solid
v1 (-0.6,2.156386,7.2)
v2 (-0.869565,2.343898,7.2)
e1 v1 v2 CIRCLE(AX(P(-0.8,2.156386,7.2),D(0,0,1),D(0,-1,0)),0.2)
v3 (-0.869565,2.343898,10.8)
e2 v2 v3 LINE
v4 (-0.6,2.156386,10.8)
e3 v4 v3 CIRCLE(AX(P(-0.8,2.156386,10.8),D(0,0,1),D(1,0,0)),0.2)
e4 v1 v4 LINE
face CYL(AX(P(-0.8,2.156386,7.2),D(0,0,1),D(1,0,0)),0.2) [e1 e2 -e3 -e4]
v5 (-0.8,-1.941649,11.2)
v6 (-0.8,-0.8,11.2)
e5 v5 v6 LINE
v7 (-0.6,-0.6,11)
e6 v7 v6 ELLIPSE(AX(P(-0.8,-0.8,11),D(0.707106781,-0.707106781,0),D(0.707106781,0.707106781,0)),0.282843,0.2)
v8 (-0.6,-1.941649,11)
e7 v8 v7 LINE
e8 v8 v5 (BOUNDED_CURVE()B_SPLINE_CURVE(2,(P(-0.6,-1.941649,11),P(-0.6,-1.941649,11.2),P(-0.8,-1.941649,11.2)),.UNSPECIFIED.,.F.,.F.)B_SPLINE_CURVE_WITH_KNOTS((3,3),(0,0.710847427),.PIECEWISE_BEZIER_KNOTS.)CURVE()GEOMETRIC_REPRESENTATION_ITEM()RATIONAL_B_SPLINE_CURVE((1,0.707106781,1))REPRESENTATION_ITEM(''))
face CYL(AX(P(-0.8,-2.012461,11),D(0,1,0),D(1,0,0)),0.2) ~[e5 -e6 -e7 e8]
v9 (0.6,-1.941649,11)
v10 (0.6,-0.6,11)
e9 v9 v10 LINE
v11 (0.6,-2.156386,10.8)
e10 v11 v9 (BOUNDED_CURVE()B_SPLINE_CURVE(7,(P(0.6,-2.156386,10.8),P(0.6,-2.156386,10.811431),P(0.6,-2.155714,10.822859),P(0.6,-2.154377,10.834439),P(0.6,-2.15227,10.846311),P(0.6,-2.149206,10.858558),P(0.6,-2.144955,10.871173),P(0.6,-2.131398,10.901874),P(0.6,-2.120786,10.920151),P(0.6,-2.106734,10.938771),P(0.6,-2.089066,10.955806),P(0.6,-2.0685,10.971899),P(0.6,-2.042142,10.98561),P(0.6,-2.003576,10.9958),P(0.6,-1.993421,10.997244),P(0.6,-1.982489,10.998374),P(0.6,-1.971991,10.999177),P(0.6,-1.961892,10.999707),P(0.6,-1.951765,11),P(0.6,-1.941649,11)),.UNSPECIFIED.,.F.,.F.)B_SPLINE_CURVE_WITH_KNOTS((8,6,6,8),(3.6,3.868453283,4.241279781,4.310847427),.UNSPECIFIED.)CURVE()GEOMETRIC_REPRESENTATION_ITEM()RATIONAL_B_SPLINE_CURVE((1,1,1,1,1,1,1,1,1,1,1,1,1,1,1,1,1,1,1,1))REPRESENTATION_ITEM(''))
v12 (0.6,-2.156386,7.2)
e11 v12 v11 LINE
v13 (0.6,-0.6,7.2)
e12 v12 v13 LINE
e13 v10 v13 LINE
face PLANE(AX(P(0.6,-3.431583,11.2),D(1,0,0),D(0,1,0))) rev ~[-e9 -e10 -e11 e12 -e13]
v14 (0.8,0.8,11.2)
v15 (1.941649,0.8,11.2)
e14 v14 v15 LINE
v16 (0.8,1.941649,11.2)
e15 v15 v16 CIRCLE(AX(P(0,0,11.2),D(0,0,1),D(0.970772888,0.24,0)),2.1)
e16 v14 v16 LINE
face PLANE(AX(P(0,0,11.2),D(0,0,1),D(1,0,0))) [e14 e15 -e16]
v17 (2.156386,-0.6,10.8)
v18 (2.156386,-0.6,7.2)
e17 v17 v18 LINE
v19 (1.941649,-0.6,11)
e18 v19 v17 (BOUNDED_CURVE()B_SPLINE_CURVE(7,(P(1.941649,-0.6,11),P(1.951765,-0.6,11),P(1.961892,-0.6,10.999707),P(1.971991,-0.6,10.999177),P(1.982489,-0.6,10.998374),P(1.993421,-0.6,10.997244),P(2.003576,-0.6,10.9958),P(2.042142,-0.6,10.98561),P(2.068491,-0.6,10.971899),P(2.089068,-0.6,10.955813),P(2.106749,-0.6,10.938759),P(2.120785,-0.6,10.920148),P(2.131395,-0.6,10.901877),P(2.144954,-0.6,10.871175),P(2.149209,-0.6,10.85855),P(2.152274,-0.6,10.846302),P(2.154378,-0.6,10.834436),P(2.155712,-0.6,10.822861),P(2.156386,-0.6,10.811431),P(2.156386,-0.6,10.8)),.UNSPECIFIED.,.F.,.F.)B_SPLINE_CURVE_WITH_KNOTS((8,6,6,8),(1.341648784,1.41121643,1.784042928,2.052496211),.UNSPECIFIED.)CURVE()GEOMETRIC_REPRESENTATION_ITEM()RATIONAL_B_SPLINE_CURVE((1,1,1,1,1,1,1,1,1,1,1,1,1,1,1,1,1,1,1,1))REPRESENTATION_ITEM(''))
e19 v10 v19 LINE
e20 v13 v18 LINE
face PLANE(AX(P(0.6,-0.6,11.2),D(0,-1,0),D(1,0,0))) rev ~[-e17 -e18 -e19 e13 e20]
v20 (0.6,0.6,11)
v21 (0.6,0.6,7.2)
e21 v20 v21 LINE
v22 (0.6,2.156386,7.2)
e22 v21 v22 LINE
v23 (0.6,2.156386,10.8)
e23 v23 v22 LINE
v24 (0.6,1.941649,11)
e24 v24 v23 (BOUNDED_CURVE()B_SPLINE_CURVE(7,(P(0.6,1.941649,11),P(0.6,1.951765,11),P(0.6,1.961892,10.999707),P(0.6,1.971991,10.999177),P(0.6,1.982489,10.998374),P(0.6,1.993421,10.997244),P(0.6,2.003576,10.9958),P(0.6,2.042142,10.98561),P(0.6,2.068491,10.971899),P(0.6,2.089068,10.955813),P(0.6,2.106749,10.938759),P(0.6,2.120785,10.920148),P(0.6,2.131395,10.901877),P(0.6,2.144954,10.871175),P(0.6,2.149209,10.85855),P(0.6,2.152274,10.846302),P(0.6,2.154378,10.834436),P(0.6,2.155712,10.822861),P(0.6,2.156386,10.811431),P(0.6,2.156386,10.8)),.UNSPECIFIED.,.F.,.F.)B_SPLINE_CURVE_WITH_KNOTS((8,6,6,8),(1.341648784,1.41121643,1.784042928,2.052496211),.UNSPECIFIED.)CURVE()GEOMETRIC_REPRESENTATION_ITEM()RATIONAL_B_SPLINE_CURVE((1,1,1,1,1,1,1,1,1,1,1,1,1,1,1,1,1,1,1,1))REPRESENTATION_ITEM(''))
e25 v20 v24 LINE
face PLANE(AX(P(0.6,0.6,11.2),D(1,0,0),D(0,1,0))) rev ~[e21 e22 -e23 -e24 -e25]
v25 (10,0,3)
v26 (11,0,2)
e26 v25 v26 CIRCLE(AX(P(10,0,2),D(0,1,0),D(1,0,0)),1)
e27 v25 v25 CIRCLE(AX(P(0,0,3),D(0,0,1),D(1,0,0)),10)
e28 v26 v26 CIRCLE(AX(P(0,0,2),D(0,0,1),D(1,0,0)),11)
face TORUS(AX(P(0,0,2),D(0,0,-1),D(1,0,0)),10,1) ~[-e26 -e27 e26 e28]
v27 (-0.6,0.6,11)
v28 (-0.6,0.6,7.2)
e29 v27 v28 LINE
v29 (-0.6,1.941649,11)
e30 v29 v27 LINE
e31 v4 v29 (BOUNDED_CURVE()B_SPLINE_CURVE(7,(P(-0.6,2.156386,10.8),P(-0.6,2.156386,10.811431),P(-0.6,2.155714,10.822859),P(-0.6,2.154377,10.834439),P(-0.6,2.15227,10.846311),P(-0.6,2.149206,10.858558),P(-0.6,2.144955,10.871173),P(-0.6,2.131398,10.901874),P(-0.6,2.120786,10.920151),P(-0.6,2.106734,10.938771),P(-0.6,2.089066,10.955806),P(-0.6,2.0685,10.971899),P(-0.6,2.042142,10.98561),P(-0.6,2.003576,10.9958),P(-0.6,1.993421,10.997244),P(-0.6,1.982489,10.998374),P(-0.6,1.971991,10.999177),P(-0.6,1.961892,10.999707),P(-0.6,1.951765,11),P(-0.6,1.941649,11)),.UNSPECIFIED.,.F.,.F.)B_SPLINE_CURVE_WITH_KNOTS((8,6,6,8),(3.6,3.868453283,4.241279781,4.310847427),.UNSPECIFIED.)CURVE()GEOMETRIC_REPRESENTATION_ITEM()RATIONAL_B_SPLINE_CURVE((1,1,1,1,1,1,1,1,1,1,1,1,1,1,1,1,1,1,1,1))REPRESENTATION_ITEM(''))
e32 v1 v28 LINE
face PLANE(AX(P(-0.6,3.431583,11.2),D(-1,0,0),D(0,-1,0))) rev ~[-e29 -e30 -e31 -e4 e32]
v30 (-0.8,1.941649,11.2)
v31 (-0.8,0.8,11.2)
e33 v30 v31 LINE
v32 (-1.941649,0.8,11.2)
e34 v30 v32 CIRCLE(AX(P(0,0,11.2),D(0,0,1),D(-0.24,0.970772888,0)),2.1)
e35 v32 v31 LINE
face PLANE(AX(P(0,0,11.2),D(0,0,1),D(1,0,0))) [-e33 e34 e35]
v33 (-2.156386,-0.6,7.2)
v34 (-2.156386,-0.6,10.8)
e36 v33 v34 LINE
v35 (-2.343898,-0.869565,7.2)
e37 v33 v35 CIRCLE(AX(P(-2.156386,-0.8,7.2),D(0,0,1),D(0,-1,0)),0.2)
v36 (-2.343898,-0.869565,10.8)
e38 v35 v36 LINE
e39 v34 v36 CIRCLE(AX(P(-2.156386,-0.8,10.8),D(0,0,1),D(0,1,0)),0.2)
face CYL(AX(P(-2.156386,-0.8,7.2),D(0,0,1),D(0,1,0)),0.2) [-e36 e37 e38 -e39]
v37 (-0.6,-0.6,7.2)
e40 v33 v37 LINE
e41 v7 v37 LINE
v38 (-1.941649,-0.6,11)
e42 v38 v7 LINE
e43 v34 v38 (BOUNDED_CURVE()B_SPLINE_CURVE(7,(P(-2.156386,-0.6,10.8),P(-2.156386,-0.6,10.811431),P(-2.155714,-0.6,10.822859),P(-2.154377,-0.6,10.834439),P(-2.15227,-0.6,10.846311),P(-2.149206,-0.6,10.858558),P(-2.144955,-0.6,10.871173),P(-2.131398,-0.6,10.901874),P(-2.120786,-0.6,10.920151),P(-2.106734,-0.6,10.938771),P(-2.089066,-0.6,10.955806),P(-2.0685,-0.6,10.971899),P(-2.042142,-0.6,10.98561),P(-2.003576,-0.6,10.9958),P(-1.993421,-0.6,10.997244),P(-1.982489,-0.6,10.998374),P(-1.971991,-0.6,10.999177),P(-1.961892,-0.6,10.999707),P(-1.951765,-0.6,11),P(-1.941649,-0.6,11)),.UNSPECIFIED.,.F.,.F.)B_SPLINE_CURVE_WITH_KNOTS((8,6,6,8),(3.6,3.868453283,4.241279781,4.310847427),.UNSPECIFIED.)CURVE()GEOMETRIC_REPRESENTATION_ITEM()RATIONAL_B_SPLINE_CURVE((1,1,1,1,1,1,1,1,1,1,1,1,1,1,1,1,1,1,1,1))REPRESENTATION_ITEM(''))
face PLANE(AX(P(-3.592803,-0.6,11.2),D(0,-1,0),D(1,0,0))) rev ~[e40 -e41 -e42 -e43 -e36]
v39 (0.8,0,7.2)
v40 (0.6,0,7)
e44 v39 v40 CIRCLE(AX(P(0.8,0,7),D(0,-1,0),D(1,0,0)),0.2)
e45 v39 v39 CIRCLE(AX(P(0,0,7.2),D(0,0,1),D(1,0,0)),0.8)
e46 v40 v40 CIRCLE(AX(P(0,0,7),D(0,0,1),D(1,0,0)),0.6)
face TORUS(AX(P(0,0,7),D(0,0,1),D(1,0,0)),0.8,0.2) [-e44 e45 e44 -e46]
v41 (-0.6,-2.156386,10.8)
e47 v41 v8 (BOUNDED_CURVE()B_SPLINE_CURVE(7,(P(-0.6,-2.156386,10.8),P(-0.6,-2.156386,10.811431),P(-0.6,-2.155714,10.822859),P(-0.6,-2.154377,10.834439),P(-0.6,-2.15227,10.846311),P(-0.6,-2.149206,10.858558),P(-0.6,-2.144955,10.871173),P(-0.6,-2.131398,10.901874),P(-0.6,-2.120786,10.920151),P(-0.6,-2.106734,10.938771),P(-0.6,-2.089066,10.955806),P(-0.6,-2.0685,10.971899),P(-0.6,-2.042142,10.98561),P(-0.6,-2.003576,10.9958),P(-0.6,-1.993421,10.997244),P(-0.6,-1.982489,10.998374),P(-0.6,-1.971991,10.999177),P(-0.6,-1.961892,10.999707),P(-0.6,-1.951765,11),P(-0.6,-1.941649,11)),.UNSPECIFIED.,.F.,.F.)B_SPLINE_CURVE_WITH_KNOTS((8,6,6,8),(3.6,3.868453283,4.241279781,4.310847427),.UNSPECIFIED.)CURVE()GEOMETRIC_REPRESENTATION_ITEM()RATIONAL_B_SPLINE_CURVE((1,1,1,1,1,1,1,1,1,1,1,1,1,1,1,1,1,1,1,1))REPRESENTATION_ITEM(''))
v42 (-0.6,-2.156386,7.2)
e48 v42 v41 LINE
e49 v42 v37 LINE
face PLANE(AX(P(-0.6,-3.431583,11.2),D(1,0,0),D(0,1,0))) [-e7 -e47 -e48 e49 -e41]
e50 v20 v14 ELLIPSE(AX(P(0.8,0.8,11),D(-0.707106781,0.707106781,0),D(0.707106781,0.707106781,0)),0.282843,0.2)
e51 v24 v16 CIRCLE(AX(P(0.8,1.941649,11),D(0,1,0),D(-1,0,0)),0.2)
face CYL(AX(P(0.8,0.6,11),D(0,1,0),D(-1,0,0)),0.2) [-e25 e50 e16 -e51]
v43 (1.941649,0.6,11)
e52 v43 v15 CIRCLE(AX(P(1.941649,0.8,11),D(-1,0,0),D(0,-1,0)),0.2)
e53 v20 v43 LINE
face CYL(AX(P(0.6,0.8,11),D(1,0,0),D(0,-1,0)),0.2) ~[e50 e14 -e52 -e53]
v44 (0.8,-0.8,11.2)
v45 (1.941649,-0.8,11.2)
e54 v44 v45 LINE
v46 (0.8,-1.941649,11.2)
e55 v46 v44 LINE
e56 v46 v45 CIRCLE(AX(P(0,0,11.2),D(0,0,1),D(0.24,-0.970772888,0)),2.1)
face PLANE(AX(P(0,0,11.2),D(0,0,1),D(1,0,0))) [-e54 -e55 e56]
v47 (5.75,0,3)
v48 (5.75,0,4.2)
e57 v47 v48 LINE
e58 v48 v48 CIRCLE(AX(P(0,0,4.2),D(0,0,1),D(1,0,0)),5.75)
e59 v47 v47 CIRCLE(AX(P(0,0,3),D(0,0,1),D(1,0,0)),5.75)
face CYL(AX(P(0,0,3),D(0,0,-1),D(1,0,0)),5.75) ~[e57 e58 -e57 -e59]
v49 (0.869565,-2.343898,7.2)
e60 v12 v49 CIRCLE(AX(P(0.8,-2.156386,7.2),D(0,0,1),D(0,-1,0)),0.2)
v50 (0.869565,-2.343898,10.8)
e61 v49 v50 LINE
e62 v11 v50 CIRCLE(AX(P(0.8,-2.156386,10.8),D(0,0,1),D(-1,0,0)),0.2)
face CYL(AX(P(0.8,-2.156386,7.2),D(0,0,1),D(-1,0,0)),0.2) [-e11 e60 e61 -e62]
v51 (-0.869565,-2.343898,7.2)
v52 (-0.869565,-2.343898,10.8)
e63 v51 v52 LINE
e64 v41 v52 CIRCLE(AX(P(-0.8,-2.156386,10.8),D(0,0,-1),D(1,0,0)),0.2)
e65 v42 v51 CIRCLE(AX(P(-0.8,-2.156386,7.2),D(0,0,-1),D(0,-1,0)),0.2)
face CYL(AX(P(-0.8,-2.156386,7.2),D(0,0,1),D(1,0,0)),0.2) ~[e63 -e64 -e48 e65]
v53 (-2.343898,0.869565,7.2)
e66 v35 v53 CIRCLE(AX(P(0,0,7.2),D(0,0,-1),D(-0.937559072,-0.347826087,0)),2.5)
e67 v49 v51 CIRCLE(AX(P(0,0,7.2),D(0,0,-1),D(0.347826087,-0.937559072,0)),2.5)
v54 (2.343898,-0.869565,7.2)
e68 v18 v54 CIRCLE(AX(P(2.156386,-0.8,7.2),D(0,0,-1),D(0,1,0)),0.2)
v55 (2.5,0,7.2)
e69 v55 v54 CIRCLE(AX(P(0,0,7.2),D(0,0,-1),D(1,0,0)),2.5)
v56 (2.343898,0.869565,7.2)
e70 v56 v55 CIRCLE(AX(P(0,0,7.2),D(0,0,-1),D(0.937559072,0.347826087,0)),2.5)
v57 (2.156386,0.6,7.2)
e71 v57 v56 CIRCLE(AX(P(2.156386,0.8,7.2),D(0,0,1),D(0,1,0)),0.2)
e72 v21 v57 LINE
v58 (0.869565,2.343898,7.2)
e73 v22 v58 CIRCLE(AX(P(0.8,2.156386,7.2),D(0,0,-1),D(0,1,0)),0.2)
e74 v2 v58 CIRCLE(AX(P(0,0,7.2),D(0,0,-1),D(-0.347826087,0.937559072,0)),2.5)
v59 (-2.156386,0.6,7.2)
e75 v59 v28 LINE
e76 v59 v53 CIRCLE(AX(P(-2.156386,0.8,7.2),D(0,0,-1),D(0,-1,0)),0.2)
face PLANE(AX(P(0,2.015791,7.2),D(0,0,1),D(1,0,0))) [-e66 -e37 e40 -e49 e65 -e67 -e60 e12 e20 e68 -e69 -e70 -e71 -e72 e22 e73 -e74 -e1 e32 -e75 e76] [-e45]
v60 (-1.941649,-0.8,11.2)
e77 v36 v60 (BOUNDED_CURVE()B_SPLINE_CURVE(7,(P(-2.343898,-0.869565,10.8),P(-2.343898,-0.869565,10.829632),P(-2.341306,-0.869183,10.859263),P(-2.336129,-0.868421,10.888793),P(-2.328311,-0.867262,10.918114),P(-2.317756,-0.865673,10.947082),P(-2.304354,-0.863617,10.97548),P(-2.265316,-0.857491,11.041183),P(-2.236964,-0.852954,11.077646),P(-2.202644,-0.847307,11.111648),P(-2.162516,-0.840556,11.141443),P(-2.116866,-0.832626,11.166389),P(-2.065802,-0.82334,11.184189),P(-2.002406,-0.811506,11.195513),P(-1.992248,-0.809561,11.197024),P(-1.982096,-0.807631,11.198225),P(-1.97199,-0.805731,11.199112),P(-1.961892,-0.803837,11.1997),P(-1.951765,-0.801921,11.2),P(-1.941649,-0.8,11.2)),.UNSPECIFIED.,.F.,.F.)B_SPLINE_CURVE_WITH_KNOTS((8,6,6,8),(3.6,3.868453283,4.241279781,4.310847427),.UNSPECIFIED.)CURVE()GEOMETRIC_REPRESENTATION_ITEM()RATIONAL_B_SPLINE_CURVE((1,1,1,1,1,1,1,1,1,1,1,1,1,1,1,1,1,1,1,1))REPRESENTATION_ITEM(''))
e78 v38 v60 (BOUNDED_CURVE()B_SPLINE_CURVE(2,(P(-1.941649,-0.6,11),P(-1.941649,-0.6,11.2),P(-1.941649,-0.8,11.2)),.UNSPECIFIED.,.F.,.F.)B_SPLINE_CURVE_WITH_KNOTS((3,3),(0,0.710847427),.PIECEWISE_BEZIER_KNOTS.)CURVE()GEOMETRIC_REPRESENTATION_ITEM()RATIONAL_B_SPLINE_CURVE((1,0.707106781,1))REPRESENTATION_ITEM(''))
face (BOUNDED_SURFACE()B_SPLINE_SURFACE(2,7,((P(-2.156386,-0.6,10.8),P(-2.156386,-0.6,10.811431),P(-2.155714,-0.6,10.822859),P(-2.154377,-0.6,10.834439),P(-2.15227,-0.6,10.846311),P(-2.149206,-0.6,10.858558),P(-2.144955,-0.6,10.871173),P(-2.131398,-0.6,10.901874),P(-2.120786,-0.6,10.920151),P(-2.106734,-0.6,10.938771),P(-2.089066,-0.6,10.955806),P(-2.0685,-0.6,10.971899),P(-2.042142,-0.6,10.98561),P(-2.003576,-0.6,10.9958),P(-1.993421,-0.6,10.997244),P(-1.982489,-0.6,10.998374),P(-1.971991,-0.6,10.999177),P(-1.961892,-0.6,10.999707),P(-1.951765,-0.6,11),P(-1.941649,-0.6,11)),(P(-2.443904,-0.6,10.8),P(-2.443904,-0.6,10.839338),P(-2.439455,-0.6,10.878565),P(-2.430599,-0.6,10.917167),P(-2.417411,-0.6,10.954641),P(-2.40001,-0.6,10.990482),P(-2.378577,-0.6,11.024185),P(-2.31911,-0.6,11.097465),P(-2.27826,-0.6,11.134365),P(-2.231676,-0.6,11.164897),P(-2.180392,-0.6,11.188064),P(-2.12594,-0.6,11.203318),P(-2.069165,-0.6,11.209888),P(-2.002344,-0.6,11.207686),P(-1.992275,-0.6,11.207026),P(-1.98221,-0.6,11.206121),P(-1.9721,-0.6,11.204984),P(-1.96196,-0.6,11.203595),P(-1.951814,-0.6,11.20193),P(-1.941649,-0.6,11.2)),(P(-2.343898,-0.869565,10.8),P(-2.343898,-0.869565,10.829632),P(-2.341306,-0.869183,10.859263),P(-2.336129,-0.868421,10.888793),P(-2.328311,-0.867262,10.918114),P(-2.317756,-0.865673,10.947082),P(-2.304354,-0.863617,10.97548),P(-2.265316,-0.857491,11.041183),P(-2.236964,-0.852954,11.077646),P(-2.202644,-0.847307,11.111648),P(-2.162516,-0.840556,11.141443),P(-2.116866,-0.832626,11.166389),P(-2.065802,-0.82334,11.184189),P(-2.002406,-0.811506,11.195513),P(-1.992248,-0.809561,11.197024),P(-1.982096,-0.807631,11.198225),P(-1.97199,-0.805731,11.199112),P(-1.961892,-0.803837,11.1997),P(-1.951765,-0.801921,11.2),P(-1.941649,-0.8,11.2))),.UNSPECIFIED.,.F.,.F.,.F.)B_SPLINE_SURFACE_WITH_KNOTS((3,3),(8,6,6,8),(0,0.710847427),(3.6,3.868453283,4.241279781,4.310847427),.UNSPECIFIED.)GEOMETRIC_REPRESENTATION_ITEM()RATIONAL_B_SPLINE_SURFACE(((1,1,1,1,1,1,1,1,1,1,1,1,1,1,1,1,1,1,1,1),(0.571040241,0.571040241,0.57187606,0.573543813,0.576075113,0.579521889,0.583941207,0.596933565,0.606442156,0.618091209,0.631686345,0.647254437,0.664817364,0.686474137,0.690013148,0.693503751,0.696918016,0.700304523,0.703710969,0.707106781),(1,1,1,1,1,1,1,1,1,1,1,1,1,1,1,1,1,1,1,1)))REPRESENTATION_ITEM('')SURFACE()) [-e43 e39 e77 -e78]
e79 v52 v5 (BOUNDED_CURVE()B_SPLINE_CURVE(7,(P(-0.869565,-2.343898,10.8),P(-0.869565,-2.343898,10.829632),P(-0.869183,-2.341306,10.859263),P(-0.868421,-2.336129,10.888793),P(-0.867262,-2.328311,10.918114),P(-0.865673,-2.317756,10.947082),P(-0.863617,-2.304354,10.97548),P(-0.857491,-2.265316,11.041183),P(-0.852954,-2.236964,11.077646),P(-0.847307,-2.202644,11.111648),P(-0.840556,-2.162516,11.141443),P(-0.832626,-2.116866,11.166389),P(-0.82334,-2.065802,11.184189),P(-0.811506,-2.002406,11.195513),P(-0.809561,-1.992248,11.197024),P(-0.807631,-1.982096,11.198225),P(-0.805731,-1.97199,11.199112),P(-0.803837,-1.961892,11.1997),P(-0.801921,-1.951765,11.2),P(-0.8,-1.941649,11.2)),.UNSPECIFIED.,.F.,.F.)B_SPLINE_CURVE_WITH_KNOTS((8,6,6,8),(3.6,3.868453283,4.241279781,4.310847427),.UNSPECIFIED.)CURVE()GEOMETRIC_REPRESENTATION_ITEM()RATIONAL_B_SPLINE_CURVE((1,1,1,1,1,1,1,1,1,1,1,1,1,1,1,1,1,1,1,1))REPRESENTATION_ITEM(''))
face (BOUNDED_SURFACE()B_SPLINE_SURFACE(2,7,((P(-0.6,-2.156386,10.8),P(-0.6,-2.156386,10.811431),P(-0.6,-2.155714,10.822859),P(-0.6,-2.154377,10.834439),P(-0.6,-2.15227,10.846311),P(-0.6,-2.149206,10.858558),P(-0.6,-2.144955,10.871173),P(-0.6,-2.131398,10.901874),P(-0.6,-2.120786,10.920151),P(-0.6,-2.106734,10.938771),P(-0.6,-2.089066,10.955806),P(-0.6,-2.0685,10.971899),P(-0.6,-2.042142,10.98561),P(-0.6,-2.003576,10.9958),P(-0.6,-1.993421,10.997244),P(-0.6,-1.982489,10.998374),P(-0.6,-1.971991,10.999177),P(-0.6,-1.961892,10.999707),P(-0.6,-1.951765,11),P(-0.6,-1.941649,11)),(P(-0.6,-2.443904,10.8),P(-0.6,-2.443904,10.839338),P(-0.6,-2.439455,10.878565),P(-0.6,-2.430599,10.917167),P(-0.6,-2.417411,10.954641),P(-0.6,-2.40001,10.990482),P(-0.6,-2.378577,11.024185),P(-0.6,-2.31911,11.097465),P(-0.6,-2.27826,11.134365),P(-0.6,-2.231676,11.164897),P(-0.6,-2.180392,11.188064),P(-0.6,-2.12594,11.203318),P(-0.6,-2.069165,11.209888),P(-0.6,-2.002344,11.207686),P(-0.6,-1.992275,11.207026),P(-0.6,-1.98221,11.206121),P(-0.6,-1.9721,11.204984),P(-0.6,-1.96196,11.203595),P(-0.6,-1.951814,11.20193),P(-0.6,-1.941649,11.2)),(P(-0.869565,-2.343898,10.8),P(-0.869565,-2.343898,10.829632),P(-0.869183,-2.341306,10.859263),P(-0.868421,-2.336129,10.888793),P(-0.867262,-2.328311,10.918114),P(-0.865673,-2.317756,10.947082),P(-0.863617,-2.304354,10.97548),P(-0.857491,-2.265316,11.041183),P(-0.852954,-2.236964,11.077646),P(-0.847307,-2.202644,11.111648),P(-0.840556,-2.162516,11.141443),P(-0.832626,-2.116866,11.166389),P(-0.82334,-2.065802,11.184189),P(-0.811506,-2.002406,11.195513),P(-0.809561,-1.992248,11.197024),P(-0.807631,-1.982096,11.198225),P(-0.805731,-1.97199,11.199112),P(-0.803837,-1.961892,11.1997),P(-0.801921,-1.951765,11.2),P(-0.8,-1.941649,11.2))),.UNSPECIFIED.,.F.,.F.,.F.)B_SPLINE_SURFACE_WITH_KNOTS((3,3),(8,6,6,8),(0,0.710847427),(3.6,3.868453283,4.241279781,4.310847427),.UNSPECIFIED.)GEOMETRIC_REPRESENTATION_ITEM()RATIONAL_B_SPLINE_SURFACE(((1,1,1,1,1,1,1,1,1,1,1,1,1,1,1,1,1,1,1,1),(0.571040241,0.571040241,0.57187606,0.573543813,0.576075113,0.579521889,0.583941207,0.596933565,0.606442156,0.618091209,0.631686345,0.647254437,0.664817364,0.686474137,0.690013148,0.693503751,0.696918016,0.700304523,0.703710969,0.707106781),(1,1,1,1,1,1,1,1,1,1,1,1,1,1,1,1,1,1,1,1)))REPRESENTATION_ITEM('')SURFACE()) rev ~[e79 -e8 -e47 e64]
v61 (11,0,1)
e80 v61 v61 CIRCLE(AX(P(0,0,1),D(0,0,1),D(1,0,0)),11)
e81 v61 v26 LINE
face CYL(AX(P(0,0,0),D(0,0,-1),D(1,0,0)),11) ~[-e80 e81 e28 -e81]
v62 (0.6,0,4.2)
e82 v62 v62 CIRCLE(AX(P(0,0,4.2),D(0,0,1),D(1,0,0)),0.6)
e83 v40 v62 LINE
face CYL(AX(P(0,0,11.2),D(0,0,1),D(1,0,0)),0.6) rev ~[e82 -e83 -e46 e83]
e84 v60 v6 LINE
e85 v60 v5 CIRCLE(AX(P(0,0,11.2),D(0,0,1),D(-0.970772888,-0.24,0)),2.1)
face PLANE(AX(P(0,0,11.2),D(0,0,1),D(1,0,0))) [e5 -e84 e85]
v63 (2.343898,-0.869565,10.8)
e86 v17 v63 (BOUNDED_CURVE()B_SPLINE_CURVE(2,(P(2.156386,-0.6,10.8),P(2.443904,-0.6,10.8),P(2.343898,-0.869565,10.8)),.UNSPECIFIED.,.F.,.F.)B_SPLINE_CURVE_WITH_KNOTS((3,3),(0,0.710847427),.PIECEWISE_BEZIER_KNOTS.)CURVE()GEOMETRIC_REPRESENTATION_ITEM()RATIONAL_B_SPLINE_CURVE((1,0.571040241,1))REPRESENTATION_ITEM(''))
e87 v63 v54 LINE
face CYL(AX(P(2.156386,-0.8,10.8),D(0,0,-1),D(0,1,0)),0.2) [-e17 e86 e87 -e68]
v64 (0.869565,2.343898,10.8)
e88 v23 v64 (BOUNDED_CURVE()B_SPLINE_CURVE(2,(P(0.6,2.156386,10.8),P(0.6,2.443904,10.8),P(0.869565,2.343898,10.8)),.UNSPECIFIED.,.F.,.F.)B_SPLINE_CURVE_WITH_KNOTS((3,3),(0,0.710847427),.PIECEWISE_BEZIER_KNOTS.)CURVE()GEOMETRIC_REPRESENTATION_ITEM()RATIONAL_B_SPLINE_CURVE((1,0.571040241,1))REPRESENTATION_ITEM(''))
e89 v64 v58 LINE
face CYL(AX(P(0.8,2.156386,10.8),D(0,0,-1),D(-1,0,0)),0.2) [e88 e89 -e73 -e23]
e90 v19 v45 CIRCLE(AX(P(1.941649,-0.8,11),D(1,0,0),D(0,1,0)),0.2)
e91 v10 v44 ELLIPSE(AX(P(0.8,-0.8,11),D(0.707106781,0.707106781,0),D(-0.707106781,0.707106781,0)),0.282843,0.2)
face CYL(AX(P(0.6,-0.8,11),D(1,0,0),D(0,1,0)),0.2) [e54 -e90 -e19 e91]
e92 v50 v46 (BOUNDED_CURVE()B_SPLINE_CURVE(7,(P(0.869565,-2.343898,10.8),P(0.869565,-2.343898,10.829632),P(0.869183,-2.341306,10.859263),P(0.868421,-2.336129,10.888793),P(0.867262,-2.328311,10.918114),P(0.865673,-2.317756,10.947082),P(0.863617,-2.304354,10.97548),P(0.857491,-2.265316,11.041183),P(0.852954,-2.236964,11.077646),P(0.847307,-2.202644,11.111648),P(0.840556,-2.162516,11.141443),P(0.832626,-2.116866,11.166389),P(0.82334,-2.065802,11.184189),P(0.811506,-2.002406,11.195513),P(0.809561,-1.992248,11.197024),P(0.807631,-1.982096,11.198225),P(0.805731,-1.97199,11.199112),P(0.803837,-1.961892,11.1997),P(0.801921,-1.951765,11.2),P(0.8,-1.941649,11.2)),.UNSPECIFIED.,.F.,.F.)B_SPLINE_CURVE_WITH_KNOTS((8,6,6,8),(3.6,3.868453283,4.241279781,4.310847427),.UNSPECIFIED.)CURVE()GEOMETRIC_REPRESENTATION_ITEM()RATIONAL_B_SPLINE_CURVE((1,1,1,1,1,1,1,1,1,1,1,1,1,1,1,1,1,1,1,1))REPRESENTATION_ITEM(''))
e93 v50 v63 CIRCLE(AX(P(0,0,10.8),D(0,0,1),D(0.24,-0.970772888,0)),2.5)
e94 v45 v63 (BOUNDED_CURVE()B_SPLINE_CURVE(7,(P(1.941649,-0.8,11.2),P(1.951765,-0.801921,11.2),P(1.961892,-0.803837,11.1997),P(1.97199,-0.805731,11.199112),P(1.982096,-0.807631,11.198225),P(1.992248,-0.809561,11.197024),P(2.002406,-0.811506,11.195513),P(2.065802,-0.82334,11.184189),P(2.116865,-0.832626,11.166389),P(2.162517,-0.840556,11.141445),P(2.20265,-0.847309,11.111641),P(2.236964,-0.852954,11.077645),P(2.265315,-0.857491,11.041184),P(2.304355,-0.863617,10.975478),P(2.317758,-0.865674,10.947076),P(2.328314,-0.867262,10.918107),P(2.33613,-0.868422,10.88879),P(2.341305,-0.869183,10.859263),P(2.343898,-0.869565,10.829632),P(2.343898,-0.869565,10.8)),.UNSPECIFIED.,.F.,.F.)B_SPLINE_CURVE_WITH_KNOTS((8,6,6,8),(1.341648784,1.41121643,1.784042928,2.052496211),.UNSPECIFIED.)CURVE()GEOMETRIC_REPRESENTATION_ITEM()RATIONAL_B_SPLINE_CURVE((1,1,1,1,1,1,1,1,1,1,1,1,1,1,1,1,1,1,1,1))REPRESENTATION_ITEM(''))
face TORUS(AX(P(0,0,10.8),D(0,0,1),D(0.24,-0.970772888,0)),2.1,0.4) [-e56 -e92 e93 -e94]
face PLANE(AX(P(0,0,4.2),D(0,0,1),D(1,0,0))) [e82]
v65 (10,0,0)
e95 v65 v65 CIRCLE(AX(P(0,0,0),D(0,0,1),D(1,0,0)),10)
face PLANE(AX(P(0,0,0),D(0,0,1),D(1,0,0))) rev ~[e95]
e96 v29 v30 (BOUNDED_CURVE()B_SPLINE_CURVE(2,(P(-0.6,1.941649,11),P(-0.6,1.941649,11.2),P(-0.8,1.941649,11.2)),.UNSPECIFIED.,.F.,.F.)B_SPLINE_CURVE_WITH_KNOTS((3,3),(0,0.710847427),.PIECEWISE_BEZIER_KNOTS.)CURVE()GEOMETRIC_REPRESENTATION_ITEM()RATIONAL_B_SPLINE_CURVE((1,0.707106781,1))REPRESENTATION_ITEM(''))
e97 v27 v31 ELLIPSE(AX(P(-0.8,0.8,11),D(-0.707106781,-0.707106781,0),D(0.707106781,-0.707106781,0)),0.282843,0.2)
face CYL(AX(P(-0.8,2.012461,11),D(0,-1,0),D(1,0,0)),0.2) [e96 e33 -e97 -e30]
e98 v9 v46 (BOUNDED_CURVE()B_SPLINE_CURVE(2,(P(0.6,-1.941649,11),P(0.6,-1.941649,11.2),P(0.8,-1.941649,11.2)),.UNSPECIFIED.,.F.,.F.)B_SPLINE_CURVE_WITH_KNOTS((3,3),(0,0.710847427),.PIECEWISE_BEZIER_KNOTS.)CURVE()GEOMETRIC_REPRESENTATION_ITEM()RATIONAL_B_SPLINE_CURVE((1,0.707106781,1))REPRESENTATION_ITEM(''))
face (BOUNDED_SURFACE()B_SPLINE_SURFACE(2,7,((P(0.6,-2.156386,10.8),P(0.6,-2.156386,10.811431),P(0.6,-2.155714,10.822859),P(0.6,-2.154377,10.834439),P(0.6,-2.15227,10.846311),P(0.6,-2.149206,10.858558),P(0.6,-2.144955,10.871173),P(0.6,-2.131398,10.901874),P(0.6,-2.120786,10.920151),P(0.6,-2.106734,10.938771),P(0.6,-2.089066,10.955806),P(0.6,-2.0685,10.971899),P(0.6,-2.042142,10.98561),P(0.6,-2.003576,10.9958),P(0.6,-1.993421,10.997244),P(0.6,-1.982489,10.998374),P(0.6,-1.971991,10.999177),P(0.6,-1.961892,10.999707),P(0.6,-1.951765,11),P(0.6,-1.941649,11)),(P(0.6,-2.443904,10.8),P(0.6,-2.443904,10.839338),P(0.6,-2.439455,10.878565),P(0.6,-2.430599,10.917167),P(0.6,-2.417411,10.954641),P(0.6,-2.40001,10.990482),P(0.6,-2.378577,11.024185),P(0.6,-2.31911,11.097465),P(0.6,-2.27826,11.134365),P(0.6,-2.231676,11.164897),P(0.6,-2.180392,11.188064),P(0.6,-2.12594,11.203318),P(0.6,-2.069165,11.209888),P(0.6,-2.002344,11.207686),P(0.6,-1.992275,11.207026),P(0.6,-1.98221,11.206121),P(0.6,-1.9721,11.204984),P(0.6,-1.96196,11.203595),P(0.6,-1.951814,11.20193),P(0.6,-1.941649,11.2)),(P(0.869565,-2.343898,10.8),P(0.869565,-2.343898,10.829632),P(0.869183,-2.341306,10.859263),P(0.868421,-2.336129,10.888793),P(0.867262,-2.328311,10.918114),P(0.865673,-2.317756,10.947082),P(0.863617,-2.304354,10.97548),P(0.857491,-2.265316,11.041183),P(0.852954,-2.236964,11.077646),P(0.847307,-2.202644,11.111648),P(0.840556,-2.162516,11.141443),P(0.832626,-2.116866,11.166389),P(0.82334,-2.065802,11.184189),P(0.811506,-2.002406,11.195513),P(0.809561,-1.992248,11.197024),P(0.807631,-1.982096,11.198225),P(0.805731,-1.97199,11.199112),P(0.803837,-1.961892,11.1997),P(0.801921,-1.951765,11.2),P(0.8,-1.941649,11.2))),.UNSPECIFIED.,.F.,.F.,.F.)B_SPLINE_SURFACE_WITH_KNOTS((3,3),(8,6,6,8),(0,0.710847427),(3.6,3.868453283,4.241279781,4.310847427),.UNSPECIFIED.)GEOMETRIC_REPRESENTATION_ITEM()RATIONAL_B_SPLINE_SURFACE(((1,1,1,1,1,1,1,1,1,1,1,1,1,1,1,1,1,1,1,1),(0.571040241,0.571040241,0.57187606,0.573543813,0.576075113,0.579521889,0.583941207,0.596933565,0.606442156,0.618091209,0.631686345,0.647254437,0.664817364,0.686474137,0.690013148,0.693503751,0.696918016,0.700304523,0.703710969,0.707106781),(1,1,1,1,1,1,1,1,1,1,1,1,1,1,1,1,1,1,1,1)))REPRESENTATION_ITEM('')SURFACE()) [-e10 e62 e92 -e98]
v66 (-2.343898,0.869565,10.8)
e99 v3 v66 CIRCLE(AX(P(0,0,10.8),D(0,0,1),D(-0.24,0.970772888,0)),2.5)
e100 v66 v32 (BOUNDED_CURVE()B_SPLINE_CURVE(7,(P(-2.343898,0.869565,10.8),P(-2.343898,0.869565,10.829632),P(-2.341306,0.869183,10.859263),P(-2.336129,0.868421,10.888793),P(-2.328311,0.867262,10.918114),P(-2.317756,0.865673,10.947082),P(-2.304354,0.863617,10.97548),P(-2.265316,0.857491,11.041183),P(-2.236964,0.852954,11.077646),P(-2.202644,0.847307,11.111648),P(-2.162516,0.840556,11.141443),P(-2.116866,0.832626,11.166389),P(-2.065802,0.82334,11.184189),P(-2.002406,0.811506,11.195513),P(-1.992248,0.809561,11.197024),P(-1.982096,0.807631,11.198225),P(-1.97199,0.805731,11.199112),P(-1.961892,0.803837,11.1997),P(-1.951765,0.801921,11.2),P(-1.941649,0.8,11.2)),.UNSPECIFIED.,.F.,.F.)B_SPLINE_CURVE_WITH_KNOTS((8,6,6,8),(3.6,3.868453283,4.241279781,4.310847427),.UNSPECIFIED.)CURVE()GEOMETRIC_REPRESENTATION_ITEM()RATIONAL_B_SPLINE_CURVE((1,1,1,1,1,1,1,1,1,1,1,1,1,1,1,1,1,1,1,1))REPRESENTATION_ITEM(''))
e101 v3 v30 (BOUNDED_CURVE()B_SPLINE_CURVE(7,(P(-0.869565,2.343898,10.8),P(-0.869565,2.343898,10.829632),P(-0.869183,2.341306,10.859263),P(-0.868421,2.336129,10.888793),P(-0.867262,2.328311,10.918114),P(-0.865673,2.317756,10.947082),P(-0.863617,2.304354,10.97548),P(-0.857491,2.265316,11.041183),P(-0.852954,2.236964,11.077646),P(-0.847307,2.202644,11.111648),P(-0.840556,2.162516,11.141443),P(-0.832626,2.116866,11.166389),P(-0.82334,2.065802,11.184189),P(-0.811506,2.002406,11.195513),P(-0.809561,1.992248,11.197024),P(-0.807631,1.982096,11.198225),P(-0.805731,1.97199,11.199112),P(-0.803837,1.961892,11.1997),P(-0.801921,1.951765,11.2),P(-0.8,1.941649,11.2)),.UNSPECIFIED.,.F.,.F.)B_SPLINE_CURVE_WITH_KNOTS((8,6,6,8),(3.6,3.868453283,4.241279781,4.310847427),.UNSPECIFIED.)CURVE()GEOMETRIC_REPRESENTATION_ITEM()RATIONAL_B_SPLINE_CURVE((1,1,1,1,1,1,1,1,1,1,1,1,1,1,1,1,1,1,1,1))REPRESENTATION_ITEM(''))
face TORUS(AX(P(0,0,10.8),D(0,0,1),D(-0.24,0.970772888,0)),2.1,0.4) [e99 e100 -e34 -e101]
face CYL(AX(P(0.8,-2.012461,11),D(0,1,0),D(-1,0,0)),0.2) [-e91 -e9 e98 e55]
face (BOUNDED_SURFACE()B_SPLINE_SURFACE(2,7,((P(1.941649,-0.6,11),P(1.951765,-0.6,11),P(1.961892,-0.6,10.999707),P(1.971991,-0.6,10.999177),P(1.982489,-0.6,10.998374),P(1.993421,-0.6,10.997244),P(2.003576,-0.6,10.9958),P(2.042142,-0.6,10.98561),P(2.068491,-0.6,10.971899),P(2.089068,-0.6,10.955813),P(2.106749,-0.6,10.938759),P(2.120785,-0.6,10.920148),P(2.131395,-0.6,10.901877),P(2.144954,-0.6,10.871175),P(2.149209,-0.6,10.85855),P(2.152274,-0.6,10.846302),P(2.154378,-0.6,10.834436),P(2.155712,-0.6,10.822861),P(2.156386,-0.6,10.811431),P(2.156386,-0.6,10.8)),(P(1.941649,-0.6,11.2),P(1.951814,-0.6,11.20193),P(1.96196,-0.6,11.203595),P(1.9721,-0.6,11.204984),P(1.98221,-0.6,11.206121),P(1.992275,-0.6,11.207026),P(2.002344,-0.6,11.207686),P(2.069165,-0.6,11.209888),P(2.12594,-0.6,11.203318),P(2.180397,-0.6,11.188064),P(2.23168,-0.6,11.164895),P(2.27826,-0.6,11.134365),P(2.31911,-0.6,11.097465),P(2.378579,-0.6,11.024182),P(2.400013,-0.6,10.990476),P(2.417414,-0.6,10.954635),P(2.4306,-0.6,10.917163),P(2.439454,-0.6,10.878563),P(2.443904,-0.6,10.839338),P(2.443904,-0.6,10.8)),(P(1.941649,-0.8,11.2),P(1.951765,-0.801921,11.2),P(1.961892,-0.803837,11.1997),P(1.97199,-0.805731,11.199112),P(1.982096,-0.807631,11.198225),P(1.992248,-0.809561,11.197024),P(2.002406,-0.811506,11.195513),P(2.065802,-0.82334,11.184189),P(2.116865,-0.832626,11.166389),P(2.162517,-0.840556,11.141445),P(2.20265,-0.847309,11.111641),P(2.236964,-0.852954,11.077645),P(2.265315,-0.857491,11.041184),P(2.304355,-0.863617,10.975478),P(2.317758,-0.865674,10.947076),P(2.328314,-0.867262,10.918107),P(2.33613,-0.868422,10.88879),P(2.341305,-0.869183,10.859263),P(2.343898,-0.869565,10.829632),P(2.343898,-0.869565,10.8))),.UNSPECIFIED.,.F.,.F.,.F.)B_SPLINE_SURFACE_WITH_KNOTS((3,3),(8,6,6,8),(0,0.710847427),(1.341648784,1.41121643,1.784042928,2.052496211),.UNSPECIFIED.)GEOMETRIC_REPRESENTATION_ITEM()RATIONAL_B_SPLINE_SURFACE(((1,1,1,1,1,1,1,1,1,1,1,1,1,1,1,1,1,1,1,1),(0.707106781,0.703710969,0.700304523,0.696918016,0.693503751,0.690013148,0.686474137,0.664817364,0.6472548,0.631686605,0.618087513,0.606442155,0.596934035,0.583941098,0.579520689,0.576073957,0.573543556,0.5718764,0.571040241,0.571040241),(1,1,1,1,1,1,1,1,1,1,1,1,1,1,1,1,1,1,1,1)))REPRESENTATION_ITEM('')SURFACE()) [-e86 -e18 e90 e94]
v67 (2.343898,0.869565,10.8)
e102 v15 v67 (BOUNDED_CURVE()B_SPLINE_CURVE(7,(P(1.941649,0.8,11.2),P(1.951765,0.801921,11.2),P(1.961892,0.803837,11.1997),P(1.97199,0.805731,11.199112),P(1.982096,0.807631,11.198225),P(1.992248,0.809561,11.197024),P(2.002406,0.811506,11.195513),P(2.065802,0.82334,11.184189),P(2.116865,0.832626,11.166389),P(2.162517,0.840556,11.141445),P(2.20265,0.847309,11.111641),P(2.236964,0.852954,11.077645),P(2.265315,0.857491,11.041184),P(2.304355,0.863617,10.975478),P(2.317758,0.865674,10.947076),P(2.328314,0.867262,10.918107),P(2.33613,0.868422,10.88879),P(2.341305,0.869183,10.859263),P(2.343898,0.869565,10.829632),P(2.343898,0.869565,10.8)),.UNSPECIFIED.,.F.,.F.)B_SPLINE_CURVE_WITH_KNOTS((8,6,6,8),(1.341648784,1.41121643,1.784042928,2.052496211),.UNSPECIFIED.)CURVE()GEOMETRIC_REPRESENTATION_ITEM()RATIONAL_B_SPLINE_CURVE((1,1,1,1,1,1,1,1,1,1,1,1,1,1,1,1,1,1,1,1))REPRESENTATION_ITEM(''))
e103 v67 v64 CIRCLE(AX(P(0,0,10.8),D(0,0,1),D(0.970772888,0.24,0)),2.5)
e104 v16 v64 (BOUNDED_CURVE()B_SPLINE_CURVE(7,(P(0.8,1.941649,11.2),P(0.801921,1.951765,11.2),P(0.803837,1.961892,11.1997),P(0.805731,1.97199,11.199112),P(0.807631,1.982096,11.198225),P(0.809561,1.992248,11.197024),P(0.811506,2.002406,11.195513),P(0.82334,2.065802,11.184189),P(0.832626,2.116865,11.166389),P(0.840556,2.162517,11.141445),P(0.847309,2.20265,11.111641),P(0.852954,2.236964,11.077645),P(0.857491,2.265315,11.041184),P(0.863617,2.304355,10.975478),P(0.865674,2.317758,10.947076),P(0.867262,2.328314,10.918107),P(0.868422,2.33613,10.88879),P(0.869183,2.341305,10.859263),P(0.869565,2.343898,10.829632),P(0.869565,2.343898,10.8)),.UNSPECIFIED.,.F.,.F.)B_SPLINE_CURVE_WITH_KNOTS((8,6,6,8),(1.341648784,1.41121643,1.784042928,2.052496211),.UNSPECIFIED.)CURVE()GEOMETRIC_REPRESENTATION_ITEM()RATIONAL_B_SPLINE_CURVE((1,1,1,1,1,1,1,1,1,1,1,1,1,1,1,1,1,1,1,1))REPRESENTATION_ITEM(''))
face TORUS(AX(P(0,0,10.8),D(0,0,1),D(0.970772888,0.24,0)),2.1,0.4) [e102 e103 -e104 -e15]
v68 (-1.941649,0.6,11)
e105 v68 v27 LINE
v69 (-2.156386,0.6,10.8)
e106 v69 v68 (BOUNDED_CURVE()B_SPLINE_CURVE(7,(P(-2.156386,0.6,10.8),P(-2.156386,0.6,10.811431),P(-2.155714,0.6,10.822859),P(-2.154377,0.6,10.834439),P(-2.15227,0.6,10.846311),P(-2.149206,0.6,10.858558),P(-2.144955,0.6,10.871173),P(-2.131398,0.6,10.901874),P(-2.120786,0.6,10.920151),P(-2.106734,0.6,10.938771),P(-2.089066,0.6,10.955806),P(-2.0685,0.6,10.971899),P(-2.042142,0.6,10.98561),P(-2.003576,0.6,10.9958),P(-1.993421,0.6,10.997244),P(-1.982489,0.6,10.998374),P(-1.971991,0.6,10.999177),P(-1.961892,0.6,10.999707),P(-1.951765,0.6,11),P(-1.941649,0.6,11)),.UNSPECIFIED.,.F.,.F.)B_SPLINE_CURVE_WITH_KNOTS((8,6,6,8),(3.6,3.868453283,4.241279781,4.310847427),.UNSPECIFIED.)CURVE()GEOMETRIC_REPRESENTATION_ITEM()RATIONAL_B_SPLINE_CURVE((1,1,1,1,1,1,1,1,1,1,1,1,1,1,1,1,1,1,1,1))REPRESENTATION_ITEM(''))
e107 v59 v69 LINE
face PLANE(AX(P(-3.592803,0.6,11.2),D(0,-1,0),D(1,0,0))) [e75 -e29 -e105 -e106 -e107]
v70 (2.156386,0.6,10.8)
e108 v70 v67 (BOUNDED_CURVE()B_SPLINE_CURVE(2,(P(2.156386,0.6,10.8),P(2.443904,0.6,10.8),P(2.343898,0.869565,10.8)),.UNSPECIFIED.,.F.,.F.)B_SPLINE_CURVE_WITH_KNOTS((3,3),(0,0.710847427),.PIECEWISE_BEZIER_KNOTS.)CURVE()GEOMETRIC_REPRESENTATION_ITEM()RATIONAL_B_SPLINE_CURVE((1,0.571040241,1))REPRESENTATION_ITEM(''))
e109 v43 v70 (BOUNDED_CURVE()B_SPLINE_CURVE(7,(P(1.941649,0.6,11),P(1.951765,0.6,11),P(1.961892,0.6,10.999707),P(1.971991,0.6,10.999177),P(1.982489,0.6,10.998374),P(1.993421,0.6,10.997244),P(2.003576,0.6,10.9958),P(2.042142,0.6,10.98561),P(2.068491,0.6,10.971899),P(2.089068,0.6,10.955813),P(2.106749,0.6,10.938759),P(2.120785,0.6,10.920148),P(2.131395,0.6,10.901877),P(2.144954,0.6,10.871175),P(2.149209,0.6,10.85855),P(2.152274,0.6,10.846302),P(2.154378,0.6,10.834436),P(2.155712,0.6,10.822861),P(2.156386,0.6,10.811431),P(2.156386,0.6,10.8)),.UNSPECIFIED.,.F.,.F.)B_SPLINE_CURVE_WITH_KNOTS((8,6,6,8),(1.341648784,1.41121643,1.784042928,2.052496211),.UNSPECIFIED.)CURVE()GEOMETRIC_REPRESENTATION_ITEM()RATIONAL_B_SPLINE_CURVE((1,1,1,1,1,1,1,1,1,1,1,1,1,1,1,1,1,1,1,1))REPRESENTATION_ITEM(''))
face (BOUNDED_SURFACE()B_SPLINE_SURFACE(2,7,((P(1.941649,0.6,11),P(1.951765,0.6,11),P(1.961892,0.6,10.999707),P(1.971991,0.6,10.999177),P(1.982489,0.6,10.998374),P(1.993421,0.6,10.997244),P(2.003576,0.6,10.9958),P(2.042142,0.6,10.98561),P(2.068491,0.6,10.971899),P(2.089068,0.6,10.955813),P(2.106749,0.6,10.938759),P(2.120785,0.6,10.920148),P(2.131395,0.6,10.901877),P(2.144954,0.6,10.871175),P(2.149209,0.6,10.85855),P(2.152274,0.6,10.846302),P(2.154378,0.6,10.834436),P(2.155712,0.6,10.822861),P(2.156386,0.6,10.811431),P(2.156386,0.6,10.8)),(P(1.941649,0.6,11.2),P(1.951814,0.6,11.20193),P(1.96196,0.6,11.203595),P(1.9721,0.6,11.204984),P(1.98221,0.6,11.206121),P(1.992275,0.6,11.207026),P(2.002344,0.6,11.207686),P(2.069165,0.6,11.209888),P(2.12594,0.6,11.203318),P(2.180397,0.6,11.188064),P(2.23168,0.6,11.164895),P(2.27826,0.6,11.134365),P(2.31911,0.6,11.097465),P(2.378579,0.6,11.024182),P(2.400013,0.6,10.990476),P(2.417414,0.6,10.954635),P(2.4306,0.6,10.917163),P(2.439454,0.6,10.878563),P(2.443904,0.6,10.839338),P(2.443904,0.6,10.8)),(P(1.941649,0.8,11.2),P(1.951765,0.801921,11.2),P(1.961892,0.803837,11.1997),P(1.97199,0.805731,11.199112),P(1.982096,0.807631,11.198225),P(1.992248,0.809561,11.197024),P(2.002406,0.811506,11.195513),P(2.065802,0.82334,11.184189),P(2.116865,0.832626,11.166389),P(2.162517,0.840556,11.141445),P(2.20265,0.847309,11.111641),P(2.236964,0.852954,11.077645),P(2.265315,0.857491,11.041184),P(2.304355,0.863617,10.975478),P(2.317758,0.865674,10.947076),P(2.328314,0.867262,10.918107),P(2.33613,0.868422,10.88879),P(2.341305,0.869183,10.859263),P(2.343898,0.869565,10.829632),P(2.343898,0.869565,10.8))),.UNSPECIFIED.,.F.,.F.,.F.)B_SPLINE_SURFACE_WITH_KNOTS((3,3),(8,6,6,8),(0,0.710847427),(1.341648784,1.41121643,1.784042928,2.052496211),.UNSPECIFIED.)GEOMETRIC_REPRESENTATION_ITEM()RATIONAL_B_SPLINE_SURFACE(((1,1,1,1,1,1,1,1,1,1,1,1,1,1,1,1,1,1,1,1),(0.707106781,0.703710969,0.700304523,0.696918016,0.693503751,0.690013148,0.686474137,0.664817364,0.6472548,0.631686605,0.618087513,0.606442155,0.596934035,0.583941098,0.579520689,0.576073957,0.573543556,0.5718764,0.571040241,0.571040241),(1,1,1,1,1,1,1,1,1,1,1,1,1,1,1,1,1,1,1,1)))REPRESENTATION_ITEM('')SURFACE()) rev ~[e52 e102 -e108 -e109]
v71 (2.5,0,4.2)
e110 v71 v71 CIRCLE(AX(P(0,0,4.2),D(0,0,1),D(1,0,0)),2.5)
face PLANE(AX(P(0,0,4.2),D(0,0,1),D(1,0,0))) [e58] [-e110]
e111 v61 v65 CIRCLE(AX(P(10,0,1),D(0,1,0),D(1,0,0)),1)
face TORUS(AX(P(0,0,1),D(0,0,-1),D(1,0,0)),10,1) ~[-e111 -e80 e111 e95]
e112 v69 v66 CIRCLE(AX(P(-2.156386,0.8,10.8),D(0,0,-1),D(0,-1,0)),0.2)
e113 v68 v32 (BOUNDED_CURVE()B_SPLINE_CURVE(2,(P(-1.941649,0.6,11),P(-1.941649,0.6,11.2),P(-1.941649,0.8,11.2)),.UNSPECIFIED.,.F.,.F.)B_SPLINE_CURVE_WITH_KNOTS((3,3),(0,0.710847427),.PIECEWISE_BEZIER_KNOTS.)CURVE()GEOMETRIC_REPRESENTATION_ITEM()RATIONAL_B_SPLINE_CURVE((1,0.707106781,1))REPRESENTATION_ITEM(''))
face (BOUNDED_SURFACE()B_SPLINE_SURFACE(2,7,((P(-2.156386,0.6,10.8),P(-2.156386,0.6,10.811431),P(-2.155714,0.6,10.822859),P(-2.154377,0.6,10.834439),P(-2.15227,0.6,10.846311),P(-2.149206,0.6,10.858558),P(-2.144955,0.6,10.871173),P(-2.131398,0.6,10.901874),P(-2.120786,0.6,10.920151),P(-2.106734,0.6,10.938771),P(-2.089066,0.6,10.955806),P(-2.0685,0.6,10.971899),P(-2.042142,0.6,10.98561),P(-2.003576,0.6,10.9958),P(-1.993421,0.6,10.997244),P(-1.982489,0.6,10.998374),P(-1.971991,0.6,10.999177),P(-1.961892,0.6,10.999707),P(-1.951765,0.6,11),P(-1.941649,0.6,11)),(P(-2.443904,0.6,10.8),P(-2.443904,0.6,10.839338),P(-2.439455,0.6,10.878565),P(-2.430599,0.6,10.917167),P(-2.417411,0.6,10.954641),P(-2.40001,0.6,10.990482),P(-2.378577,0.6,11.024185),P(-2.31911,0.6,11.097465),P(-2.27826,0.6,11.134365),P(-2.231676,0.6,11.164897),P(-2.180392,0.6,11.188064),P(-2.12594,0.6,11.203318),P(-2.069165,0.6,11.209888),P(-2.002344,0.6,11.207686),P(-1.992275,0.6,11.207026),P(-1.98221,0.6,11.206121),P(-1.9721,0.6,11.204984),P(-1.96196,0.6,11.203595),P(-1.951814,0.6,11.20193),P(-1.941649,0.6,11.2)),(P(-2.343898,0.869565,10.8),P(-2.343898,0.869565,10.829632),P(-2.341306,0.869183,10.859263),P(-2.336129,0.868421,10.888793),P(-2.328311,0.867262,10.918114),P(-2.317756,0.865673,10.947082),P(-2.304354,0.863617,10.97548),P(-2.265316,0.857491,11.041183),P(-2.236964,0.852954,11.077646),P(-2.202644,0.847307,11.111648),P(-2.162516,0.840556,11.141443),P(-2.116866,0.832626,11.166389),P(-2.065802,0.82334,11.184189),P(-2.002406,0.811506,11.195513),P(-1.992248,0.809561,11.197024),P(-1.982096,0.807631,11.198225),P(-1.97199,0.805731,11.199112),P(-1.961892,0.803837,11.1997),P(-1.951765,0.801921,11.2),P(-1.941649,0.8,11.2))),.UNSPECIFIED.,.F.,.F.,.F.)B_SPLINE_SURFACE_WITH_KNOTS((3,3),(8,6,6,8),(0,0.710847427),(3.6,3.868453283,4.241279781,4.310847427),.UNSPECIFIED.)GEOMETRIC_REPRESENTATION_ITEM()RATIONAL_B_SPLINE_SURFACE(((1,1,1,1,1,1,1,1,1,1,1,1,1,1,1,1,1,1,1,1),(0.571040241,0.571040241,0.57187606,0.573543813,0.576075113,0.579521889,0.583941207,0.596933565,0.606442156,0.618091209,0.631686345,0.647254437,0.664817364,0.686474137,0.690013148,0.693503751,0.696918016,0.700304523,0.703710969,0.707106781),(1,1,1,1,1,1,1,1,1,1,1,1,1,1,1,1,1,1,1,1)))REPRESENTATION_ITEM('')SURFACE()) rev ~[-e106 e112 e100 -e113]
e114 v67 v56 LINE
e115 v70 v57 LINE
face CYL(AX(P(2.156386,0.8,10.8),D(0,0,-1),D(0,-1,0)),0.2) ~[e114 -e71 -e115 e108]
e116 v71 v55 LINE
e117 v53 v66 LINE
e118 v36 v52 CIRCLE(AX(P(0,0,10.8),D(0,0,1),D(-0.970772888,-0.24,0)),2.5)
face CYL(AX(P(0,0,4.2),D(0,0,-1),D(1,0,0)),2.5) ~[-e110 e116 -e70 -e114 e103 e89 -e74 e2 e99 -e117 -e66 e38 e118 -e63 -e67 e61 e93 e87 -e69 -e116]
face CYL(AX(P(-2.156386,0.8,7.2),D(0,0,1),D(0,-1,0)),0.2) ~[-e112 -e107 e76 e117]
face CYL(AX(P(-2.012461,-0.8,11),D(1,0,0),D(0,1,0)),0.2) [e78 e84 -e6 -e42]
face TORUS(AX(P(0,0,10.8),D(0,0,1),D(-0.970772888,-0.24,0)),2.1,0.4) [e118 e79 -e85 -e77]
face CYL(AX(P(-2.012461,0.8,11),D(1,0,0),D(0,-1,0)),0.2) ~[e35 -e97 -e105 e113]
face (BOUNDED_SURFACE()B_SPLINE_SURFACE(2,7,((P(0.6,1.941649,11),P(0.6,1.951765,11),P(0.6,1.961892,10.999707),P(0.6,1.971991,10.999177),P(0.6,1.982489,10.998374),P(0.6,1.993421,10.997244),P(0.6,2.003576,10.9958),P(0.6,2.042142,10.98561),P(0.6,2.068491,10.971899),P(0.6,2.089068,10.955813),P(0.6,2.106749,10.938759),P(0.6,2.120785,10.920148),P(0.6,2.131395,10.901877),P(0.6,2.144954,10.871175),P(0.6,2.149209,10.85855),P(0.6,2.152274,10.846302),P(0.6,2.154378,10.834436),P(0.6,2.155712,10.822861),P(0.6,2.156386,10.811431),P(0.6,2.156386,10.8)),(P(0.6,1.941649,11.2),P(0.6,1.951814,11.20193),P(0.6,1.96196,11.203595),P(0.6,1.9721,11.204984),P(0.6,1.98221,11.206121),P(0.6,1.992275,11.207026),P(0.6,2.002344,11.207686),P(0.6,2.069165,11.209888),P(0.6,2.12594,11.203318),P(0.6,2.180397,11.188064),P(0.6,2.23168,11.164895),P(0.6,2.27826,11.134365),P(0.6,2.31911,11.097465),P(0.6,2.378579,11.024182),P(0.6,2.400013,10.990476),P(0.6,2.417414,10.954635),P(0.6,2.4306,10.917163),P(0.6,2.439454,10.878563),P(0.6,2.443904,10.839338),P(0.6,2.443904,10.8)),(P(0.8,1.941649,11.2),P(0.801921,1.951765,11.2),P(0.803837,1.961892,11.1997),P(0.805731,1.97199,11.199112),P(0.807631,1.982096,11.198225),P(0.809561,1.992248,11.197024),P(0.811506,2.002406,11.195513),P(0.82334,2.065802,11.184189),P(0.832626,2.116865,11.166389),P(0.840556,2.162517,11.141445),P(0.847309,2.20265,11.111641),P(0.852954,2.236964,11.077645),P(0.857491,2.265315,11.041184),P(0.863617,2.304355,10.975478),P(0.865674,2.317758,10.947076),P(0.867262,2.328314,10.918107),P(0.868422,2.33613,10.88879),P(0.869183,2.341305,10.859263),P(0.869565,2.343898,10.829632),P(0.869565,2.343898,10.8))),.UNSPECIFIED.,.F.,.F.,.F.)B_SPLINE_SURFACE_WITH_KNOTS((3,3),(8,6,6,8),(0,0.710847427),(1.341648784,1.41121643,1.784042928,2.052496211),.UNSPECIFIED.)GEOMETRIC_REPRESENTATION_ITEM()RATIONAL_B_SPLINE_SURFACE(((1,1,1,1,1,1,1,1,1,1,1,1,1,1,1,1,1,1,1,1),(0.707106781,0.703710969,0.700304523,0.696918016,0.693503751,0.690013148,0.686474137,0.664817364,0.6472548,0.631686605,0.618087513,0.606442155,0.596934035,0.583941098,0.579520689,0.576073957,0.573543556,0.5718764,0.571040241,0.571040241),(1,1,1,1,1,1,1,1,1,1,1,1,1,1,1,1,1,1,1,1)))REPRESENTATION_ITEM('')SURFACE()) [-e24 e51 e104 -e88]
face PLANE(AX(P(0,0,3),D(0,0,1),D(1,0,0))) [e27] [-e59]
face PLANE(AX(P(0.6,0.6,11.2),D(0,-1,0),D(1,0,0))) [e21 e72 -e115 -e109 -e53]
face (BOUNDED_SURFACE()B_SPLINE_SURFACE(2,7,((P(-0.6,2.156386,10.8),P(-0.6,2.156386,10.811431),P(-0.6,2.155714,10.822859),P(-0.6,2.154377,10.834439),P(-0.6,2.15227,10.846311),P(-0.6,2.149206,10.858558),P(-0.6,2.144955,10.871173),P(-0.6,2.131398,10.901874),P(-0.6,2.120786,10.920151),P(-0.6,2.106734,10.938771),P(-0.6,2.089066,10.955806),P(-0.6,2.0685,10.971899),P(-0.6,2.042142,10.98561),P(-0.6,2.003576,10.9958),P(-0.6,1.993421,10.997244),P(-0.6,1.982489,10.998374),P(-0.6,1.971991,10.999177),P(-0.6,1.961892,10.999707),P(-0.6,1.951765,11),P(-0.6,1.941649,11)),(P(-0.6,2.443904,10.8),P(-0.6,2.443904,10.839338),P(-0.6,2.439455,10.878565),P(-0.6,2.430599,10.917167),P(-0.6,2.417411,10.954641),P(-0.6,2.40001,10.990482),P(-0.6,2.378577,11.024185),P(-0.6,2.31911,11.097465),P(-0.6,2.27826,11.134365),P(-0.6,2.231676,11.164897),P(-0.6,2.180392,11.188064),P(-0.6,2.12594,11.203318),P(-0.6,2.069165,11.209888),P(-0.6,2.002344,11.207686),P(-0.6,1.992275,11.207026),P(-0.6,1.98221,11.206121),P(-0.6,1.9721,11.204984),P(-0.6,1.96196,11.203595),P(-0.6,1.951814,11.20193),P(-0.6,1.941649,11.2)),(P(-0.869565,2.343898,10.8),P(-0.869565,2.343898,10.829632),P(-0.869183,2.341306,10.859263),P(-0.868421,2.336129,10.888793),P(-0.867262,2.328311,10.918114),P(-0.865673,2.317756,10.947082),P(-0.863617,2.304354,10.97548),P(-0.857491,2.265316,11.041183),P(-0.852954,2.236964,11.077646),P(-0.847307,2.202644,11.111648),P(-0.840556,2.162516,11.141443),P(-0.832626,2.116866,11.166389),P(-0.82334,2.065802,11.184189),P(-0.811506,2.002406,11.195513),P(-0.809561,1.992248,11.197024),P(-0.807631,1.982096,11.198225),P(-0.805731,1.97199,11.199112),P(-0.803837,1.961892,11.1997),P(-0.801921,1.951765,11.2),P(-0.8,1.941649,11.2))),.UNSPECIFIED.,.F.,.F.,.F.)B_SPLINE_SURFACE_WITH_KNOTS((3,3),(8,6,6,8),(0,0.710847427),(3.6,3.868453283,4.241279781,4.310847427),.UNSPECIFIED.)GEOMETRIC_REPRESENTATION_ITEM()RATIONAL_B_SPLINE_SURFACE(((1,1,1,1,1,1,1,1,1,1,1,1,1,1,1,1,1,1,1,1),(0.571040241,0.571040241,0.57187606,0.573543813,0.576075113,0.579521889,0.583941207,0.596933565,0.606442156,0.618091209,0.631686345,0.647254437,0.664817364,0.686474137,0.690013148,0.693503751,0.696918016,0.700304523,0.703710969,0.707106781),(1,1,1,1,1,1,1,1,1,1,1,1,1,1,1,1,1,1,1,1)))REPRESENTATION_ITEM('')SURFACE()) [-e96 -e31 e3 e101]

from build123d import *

# Parameters (mm, degrees)
F0_R      = 11
F1_DEPTH  = 3
F2_R      = 5.75
F3_DEPTH  = 1.2
F4_R      = 2.5
F5_DEPTH  = 7
F6_R      = 0.6
F10_DEPTH = 7
F11_W     = 1.2
F11_H     = 2.8315826069
F11_H_2   = 1.2
F11_W_2   = 2.9928033758
F12_DEPTH = 4
F13_R     = 0.4
F14_R     = 1
F15_R     = 0.2


# Not quite as in the source:
# - a feature of the source that left no trace in its solid (it failed there, or was rolled back) is left out


with BuildPart() as f1:
    # F0 (on Top) → F1 (new body)
    with BuildSketch(Plane.XY):
        Circle(F0_R)
    extrude(amount=F1_DEPTH)

    # F2 (on face) → F3 (join)
    with BuildSketch(Plane.XY.offset(3)):
        Circle(F2_R)
    extrude(amount=F3_DEPTH)

    # F4 (on face) → F5 (join)
    with BuildSketch(Plane.XY.offset(4.2)):
        Circle(F4_R)
    extrude(amount=F5_DEPTH)

    # F6 (on face) → F10 (cut)
    with BuildSketch(Plane.XY.offset(11.2)):
        Circle(F6_R)
    extrude(amount=-F10_DEPTH, mode=Mode.SUBTRACT)

    # F11 (on face) → F12 (cut)
    with BuildSketch(Plane.XY.offset(11.2)):
        with Locations((0, 2.0157913034)):
            Rectangle(F11_W, F11_H)
        Rectangle(F11_W, F11_H_2)
        with Locations((-2.0964016879, 0)):
            Rectangle(F11_W_2, F11_H_2)
        with Locations((2.0964016879, 0)):
            Rectangle(F11_W_2, F11_H_2)
        with Locations((0, -2.0157913034)):
            Rectangle(F11_W, F11_H)
    extrude(amount=-F12_DEPTH, mode=Mode.SUBTRACT)

    # F13
    f13_edges = [f1.edges().sort_by_distance(p)[0] for p in [
        (1.767767, -1.767767, 11.2),
        (-1.767767, -1.767767, 11.2),
        (-1.767767, 1.767767, 11.2),
        (1.767767, 1.767767, 11.2),
    ]]
    fillet(f13_edges, radius=F13_R)

    # F14
    f14_edges = [f1.edges().sort_by_distance(p)[0] for p in [
        (-11, 0, 3),
        (-11, 0, 0),
    ]]
    fillet(f14_edges, radius=F14_R)

    # F15
    f15_edges = [f1.edges().sort_by_distance(p)[0] for p in [
        (-0.6, 1.306231, 11.2),
        (-1.484924, 1.484924, 11.2),
        (-1.306231, 0.6, 11.2),
        (1.306231, 0.6, 11.2),
        (1.484924, 1.484924, 11.2),
        (0.6, 1.306231, 11.2),
        (0.6, -1.306231, 11.2),
        (1.484924, -1.484924, 11.2),
        (1.306231, -0.6, 11.2),
        (-1.306231, -0.6, 11.2),
        (-1.484924, -1.484924, 11.2),
        (-0.6, -1.306231, 11.2),
        (-0.6, 0, 7.2),
        (2.426932, -0.6, 9),
        (0.6, -2.426932, 9),
        (-0.6, -2.426932, 9),
        (-2.426932, -0.6, 9),
        (2.426932, 0.6, 9),
        (-2.426932, 0.6, 9),
        (0.6, 2.426932, 9),
        (-0.6, 2.426932, 9),
        (2.305572, -0.6, 11.08332),
        (0.6, -2.305572, 11.08332),
        (-0.6, -2.305572, 11.08332),
        (-2.305572, -0.6, 11.08332),
        (2.305572, 0.6, 11.08332),
        (0.6, 2.305572, 11.08332),
        (-2.305572, 0.6, 11.08332),
        (-0.6, 2.305572, 11.08332),
    ]]
    fillet(f15_edges, radius=F15_R)


solid = f1.part
